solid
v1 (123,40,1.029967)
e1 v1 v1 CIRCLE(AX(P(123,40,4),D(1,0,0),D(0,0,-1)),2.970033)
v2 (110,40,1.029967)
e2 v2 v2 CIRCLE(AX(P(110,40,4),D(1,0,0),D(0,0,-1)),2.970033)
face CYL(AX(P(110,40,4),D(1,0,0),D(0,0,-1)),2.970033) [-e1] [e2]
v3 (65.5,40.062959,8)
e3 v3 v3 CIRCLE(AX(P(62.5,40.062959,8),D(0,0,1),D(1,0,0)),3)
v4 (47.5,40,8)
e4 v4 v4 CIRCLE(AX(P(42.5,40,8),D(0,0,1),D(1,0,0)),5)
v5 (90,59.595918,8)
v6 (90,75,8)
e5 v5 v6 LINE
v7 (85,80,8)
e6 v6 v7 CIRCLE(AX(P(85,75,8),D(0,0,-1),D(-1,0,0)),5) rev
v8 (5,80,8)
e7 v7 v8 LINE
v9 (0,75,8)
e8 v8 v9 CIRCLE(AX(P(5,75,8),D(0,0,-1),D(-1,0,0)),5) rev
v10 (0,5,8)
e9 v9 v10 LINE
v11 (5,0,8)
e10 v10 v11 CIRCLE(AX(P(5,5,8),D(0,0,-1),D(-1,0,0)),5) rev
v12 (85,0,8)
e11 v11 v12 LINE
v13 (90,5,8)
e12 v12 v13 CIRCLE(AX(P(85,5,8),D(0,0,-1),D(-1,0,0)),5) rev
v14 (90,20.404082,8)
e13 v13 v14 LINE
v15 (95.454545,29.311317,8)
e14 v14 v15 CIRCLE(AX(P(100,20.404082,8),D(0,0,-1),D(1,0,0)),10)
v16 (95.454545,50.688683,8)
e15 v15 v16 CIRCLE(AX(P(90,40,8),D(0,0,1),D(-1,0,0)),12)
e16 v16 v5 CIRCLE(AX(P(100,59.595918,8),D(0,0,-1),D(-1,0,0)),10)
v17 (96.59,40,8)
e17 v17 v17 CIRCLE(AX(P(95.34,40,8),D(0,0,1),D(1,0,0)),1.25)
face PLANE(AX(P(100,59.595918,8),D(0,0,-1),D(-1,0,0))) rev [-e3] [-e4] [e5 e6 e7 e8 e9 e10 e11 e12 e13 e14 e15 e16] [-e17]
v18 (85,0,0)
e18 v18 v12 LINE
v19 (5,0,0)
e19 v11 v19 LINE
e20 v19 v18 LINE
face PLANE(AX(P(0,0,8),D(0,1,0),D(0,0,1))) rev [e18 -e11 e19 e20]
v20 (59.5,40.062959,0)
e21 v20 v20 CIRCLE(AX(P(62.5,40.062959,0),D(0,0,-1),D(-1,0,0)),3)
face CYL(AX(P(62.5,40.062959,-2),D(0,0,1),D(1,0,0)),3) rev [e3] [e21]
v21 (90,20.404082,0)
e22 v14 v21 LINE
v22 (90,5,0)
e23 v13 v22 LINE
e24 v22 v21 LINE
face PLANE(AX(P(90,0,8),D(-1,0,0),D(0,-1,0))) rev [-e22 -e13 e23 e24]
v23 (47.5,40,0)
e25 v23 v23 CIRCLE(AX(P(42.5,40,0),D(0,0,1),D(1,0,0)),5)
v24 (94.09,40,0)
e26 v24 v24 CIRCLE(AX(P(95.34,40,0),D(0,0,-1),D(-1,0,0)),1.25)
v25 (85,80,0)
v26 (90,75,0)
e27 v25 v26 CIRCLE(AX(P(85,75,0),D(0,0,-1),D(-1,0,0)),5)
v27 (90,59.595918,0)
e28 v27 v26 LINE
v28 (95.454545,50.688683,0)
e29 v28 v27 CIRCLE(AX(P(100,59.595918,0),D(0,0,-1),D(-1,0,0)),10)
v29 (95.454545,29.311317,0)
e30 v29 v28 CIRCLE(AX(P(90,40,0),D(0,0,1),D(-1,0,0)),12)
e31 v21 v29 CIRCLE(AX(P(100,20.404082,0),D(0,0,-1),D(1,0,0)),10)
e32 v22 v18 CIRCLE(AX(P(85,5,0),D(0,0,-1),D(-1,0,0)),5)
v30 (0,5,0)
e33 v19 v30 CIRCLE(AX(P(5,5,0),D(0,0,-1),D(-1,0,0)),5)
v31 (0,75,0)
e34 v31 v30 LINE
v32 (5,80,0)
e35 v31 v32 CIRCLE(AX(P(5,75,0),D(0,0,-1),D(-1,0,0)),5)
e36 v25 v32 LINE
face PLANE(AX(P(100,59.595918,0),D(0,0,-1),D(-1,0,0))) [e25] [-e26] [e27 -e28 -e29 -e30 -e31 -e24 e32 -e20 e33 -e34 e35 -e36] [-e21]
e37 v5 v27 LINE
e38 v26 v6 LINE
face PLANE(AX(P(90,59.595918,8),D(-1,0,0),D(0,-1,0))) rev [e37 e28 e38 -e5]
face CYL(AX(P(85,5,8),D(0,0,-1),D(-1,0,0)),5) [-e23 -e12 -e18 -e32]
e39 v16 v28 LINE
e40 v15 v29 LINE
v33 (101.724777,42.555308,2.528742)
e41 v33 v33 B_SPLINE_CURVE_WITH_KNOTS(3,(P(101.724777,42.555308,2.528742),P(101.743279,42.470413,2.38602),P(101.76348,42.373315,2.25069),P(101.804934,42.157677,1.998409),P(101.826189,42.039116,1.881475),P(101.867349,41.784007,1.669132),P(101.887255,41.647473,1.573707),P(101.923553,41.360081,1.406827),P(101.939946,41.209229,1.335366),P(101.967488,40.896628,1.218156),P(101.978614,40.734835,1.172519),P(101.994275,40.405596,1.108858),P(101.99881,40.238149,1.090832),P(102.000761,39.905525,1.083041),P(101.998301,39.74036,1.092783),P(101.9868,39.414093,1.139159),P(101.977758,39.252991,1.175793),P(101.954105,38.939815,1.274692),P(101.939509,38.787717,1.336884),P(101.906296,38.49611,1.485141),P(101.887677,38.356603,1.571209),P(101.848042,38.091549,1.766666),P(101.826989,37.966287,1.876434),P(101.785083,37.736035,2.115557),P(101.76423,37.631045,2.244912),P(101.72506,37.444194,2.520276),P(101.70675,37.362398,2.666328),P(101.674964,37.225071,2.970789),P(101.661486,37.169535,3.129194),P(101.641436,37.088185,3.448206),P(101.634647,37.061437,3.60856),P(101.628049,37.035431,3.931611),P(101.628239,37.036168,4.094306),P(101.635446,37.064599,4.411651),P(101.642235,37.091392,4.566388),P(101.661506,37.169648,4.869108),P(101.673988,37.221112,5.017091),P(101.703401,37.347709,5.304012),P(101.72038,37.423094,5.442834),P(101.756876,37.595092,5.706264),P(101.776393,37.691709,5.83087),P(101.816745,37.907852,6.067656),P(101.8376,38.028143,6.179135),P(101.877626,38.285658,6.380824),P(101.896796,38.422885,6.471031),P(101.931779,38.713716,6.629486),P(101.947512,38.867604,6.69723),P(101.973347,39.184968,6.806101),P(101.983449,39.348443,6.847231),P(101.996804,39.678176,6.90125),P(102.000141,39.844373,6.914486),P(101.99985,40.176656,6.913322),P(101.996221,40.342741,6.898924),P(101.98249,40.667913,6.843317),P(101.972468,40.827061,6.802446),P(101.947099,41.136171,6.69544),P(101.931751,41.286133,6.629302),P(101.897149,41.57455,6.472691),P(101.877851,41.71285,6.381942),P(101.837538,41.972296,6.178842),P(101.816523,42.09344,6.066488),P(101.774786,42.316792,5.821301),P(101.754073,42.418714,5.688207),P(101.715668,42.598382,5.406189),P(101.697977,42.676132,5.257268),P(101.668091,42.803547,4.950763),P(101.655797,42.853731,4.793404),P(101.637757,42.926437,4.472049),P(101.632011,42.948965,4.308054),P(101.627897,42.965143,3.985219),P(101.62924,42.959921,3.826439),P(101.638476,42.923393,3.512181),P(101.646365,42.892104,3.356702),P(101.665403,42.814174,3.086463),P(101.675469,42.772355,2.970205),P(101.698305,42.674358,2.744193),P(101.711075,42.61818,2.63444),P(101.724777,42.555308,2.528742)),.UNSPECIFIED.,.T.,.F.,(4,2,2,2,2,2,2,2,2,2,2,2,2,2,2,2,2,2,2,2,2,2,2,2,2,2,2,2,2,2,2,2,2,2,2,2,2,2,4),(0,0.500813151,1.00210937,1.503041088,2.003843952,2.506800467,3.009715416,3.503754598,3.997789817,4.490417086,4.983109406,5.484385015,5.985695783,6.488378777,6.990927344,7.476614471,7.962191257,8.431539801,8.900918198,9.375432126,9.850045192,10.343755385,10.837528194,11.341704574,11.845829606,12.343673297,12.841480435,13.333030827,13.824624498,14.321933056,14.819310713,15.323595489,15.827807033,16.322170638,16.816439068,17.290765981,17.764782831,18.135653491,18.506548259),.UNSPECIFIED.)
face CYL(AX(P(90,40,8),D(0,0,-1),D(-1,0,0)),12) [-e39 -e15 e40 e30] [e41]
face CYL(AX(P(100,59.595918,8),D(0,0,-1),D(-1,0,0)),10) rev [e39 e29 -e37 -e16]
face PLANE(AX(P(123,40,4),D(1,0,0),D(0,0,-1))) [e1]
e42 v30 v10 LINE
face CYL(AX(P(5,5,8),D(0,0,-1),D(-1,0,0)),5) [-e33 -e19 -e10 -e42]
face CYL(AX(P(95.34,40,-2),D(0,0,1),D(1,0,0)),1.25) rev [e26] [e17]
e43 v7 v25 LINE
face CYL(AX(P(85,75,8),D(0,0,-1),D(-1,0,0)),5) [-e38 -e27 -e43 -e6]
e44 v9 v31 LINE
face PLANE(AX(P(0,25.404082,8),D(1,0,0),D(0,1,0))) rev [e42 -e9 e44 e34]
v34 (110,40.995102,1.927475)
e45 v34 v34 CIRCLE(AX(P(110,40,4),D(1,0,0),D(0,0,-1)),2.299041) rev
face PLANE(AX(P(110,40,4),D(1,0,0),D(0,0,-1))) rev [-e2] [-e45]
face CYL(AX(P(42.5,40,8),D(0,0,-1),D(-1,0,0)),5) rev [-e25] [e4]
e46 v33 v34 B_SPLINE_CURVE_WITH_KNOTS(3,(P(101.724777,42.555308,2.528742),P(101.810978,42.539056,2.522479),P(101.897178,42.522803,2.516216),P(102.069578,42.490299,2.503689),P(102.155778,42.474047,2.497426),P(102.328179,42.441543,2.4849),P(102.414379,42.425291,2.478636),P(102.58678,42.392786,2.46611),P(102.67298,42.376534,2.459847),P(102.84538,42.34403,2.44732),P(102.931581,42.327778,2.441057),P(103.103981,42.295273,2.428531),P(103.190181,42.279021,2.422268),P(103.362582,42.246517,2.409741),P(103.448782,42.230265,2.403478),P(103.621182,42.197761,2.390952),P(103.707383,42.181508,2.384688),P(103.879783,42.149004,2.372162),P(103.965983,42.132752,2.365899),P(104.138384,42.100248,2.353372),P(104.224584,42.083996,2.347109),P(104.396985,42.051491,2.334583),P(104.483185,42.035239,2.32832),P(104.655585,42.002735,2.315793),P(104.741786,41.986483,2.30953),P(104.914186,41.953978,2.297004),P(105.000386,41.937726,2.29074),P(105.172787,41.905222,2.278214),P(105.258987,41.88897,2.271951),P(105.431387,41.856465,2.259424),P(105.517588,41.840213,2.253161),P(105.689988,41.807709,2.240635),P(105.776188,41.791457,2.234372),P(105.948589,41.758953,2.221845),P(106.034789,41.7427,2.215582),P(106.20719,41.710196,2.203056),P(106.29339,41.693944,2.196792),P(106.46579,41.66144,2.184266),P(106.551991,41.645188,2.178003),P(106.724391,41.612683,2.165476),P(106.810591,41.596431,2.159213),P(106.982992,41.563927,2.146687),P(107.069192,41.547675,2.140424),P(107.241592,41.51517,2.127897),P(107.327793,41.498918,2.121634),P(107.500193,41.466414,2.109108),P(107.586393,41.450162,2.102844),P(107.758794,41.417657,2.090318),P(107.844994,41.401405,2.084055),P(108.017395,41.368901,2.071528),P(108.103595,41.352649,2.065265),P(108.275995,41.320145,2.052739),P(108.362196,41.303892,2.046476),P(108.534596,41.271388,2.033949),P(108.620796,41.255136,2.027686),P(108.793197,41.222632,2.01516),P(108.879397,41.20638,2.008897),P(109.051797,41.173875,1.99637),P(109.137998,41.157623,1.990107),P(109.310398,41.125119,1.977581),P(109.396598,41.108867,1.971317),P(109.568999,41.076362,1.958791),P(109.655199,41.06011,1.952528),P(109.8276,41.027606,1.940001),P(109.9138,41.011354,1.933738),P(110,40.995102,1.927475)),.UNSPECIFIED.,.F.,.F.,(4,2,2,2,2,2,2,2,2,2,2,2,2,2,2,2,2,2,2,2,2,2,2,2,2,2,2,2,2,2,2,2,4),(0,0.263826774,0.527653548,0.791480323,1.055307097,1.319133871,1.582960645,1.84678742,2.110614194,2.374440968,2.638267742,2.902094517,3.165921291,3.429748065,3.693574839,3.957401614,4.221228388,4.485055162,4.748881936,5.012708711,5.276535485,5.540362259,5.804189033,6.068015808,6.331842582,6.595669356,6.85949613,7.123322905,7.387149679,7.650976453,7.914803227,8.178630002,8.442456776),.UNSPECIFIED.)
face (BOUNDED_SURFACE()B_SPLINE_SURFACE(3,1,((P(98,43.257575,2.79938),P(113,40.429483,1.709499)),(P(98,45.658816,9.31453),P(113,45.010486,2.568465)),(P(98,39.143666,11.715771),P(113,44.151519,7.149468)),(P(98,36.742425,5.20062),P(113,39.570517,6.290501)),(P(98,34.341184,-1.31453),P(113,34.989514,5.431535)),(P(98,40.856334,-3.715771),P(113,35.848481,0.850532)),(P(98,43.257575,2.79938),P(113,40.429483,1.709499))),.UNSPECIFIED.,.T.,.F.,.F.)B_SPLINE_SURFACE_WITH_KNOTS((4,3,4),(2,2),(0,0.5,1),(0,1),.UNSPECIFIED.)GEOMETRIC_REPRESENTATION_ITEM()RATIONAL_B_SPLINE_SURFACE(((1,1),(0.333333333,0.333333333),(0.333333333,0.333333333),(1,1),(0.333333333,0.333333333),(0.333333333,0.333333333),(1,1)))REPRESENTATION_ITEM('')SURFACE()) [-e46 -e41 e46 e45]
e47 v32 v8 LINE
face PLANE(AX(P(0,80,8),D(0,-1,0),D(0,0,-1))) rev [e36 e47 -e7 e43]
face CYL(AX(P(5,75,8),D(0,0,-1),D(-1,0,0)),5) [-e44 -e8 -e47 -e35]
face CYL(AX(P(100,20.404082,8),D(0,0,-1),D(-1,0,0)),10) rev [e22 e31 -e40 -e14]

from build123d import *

# Parameters (mm, degrees)
SKETCH1_R                = 5
BOSS_EXTRUDE1_DEPTH      = 8
BOSS_EXTRUDE2_DEPTH      = 10
BOSS_EXTRUDE2_DEPTH_BACK = 3
SKETCH4_R                = 2.970033329
FILLET6_R                = 5
SKETCH5_R                = 1.25
CUT_EXTRUDE2_DEPTH       = 10
SKETCH6_R                = 3
CUT_EXTRUDE3_DEPTH       = 10


with BuildPart() as part:
    # Sketch1 → Boss-Extrude1 (new body)
    with BuildSketch(Plane.XY):
        with BuildLine():
            Line((0, 25.404082058), (0, 80))
            Line((0, 80), (90, 80))
            Line((90, 80), (90, 59.595917942))
            ThreePointArc((90, 59.595917942), (91.471971346, 54.373588264), (95.454545455, 50.688682514))
            ThreePointArc((95.454545455, 50.688682514), (102, 40), (95.454545455, 29.311317486))
            ThreePointArc((95.454545455, 29.311317486), (91.471971346, 25.626411736), (90, 20.404082058))
            Line((90, 20.404082058), (90, 0))
            Line((90, 0), (0, 0))
            Line((0, 0), (0, 25.404082058))
        make_face()
        with Locations((42.5, 40)):
            Circle(SKETCH1_R, mode=Mode.SUBTRACT)
    extrude(amount=BOSS_EXTRUDE1_DEPTH)

    # Loft1: read off the stored shape, not the designer's step
    # Loft1: loft between two sections, ruled curve by curve
    loft1_from = [
        Edge.make_bspline([(98, 43.257575322, 2.799379564), (98, 45.658816193, 9.314530208), (98, 39.143665549, 11.715771079), (98, 36.742424678, 5.200620436), (98, 34.341183807, -1.314530208), (98, 40.856334451, -3.715771079), (98, 43.257575322, 2.799379564)], [0, 0, 0, 0, 0.5, 0.5, 0.5, 1, 1, 1, 1], 3, [1, 0.333333333, 0.333333333, 1, 0.333333333, 0.333333333, 1]),
    ]
    loft1_to = [
        Edge.make_bspline([(113, 40.429483248, 1.709498759), (113, 45.010485729, 2.568465255), (113, 44.151519233, 7.149467737), (113, 39.570516752, 6.290501241), (113, 34.989514271, 5.431534745), (113, 35.848480767, 0.850532263), (113, 40.429483248, 1.709498759)], [0, 0, 0, 0, 0.5, 0.5, 0.5, 1, 1, 1, 1], 3, [1, 0.333333333, 0.333333333, 1, 0.333333333, 0.333333333, 1]),
    ]
    loft1 = Solid(Shell([*[Face.make_surface_from_curves(loft1_from[k], loft1_to[k]) for k in range(1)], Face(Wire(loft1_from)), Face(Wire(loft1_to))]))
    add(loft1)

    # Sketch4 → Boss-Extrude2 (add, two sides: drawn at the far end of the back side and taken through both)
    with BuildSketch(Plane(origin=(113, 0, 0), x_dir=(0, 0, -1), z_dir=(1, 0, 0)).offset(-BOSS_EXTRUDE2_DEPTH_BACK)):
        with Locations((-4, 40)):
            Circle(SKETCH4_R)
    extrude(amount=BOSS_EXTRUDE2_DEPTH + BOSS_EXTRUDE2_DEPTH_BACK)

    # Fillet6
    fillet6_edges = [part.edges().sort_by_distance(p)[0] for p in [
        (0, 80, 4),
        (90, 80, 4),
        (90, 0, 4),
        (0, 0, 4),
    ]]
    fillet(fillet6_edges, radius=FILLET6_R)

    # Sketch5 → Cut-Extrude2 (cut)
    with BuildSketch(Plane.XY.offset(8)):
        with Locations((95.34, 40)):
            Circle(SKETCH5_R)
    extrude(amount=-CUT_EXTRUDE2_DEPTH, mode=Mode.SUBTRACT)

    # Sketch6 → Cut-Extrude3 (cut)
    with BuildSketch(Plane.XY.offset(8)):
        with Locations((62.5, 40.062959469)):
            Circle(SKETCH6_R)
    extrude(amount=-CUT_EXTRUDE3_DEPTH, mode=Mode.SUBTRACT)


solid = part.part
